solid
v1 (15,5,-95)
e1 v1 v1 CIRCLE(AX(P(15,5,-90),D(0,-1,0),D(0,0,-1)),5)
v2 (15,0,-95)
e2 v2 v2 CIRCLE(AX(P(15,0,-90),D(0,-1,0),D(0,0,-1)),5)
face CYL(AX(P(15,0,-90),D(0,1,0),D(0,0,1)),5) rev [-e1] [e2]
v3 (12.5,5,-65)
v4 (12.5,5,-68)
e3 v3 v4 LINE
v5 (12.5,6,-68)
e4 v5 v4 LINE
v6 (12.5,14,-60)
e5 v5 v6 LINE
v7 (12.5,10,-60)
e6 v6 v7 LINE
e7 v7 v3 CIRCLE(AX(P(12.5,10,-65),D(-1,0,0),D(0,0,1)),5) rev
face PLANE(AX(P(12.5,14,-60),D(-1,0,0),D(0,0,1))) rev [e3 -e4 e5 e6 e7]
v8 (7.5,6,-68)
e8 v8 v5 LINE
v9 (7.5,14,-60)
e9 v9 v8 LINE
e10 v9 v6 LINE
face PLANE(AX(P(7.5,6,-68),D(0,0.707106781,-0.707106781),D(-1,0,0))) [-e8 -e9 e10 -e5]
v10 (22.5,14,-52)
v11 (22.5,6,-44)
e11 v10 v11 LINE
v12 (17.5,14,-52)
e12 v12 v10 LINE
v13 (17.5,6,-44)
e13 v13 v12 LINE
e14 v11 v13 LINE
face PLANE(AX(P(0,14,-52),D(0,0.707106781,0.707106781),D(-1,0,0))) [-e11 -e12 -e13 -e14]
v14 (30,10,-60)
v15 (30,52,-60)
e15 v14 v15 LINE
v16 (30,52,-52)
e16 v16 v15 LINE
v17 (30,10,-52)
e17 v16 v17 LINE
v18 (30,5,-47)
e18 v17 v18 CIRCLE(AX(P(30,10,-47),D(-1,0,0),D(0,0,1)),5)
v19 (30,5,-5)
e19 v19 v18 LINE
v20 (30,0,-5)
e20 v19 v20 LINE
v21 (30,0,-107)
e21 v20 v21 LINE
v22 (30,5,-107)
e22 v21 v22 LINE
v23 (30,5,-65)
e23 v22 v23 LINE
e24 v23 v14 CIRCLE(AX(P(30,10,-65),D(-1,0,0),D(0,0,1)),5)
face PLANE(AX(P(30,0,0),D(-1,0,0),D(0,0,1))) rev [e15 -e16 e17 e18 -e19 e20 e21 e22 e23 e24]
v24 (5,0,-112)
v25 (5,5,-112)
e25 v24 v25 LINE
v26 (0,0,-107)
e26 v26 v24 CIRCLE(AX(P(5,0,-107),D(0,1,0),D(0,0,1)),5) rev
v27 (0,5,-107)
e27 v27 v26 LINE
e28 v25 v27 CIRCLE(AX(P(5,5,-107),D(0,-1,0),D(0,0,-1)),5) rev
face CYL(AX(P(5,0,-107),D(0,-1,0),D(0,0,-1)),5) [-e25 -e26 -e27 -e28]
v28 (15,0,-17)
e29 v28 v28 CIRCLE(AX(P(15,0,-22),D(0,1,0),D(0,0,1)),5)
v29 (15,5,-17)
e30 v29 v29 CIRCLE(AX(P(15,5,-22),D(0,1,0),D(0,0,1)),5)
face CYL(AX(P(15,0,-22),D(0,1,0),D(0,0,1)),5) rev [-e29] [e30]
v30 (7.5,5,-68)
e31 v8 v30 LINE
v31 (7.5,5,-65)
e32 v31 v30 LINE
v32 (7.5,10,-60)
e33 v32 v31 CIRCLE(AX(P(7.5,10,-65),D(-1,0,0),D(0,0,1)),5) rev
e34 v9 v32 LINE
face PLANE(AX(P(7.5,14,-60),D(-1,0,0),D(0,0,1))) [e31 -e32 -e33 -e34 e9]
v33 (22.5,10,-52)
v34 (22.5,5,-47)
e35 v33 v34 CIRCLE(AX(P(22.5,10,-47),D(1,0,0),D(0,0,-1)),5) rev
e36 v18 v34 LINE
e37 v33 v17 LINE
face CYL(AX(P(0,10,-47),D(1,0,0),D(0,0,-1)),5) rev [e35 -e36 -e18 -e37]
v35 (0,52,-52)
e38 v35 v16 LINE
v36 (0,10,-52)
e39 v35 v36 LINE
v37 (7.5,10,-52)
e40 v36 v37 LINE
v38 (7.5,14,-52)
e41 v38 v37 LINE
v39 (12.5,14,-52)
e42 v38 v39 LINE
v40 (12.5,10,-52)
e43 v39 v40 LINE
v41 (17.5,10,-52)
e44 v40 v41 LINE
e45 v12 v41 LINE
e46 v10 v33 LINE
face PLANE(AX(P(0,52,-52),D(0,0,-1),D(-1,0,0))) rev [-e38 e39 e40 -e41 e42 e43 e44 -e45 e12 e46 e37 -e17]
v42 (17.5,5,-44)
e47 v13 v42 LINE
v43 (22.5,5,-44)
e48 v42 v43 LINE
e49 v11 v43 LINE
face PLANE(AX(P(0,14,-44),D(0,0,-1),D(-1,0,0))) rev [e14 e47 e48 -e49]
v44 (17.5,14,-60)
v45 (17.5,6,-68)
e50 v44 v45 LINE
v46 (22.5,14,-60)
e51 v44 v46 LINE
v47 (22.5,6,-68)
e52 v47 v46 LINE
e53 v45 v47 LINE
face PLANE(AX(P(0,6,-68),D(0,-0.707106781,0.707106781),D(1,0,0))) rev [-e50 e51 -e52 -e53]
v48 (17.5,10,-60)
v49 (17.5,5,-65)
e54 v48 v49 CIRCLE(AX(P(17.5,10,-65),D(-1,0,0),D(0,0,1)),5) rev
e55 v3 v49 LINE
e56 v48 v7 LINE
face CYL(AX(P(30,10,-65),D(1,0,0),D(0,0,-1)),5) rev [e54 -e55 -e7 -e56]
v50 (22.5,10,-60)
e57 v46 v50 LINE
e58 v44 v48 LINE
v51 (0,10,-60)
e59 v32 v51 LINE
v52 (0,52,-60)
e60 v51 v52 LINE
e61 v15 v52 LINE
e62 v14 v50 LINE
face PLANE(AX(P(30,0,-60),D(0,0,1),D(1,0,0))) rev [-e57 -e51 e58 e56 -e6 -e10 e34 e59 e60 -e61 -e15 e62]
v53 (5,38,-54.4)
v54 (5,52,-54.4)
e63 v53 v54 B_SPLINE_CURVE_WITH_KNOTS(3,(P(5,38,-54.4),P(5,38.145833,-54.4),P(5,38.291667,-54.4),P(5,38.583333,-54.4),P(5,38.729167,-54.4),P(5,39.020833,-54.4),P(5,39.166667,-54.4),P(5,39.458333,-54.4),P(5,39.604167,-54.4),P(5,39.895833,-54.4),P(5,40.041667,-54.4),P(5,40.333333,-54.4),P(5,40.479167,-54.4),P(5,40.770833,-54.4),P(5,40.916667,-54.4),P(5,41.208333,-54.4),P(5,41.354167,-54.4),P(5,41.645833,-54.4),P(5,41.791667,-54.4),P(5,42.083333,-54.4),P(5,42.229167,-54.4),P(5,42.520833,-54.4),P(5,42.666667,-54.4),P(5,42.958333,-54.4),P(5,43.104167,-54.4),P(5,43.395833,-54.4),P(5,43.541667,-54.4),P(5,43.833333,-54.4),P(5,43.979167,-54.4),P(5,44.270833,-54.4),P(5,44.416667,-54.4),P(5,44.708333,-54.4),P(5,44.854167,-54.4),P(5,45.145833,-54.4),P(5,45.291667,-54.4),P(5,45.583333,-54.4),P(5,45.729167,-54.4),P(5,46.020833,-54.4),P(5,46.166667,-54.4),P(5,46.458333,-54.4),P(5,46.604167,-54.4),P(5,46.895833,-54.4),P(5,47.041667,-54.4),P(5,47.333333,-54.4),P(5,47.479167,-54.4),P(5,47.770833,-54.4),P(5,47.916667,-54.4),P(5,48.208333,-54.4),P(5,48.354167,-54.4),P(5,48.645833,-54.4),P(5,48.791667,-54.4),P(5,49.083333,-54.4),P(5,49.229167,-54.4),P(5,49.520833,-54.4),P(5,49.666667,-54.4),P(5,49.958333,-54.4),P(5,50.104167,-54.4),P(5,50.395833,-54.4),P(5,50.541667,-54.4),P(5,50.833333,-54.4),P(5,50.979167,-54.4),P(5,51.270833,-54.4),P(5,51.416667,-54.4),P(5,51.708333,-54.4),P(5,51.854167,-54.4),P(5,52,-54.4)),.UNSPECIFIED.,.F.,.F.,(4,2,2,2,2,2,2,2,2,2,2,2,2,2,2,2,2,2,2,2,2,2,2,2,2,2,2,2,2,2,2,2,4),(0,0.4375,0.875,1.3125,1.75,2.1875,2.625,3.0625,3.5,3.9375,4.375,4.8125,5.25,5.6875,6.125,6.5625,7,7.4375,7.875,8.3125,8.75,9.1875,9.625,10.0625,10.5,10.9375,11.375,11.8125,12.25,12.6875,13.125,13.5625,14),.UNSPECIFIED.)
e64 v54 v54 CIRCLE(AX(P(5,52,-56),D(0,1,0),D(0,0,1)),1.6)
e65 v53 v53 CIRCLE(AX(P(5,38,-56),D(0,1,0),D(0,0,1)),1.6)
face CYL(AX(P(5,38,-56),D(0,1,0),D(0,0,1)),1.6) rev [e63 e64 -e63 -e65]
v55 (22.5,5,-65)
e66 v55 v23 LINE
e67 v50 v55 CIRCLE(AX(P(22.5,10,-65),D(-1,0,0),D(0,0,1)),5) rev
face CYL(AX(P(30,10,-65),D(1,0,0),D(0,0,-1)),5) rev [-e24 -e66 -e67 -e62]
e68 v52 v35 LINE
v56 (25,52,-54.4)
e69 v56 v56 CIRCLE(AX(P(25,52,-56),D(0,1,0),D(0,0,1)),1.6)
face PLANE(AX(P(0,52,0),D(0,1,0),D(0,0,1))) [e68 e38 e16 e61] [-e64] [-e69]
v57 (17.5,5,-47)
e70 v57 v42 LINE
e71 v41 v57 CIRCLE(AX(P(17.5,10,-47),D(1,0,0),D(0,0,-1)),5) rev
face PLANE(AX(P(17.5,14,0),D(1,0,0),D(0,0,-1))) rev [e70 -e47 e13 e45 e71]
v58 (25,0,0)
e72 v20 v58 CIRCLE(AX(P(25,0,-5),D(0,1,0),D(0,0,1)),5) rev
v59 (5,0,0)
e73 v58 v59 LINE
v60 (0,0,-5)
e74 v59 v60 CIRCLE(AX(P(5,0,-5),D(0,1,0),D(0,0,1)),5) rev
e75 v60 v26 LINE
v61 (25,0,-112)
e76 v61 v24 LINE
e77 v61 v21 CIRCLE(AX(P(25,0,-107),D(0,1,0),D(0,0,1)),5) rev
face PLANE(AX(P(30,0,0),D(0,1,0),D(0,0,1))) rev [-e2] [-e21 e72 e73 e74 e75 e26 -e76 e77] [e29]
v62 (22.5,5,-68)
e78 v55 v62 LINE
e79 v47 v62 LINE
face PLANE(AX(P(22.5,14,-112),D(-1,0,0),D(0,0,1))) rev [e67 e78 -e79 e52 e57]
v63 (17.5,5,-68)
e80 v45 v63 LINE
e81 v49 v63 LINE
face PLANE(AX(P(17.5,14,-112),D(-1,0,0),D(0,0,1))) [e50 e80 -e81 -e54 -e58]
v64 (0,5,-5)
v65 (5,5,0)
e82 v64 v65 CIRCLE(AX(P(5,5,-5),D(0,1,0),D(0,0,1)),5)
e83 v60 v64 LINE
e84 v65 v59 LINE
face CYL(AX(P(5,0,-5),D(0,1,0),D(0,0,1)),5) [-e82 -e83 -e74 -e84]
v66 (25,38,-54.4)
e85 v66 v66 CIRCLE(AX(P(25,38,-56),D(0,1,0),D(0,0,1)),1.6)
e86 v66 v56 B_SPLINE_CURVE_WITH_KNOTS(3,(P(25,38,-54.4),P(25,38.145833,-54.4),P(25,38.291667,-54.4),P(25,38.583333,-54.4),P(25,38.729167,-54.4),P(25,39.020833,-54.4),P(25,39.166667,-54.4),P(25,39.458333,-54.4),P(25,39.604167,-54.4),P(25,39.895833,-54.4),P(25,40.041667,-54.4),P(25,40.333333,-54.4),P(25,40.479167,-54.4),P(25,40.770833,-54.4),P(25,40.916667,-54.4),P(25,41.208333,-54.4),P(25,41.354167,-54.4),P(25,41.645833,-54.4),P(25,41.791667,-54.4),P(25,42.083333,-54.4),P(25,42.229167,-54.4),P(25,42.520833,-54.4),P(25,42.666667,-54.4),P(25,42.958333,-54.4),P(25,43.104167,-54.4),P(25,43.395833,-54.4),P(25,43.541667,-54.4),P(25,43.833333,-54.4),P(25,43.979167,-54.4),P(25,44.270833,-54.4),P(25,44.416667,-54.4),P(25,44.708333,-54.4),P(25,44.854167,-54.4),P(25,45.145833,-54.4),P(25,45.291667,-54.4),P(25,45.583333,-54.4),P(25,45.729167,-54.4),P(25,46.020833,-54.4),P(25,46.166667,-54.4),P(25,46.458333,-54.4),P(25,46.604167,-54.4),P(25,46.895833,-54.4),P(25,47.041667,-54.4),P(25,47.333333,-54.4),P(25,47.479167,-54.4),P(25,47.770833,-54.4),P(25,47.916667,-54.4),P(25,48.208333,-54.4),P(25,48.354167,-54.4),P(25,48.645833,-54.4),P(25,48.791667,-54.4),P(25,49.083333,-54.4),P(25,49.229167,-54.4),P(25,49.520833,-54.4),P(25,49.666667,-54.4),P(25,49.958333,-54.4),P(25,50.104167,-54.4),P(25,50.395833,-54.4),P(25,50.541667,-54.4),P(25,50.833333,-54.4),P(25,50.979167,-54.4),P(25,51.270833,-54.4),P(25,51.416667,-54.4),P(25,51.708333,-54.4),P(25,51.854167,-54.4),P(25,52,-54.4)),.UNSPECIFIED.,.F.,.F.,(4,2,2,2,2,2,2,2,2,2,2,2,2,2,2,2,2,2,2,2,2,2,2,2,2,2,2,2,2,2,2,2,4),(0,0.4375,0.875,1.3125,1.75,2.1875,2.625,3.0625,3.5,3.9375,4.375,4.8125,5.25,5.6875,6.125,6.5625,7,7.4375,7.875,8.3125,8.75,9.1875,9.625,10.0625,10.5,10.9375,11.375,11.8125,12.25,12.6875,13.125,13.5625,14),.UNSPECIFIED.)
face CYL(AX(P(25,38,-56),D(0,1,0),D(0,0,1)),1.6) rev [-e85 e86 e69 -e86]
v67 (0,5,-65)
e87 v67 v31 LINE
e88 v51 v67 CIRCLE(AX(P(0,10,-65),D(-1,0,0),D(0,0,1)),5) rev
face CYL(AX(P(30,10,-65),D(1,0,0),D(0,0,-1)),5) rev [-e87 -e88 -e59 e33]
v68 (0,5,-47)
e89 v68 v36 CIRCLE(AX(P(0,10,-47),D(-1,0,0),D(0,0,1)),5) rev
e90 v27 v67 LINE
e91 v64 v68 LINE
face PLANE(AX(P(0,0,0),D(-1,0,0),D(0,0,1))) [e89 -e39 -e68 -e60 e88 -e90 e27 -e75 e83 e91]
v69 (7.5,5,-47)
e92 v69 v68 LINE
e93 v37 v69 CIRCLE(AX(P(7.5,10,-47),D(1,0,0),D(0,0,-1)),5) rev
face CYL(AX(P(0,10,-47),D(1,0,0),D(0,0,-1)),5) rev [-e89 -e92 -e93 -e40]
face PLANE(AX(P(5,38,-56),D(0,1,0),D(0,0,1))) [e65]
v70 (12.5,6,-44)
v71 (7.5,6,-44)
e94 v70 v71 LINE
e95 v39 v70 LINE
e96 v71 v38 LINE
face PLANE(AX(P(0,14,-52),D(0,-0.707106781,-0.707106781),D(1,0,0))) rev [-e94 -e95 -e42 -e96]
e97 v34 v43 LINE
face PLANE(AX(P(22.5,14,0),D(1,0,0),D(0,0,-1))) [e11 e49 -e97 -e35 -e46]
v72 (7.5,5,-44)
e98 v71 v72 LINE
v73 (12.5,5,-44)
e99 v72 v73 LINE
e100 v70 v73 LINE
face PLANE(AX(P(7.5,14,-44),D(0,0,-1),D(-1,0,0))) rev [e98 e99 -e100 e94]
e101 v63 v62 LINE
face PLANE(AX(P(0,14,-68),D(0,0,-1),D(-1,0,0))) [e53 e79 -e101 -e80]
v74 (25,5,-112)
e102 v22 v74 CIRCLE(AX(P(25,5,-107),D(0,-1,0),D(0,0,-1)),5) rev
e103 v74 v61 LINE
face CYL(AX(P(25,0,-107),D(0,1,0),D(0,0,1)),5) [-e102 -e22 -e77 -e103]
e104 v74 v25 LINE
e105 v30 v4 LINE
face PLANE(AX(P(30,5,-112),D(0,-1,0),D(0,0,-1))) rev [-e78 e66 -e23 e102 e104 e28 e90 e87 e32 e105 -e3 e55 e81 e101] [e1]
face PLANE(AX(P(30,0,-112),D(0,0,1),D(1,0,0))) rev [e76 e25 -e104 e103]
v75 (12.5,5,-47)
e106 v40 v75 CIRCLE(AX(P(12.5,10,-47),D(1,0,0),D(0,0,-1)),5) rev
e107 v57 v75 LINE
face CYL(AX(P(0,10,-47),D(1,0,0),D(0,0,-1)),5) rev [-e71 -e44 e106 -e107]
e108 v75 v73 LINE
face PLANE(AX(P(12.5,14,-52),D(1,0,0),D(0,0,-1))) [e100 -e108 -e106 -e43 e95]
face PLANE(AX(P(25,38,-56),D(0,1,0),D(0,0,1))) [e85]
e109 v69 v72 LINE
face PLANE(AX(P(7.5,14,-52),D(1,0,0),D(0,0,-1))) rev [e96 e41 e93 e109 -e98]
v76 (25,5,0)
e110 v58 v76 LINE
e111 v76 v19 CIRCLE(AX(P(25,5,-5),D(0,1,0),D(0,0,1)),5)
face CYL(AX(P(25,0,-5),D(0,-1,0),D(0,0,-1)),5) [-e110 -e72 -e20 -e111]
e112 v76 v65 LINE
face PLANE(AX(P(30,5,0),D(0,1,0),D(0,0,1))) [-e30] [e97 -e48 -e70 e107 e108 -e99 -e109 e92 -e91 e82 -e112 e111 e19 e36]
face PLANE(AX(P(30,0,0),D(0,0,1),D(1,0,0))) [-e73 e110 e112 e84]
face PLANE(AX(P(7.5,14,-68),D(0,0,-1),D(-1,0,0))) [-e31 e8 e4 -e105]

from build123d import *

# Parameters (mm, degrees)
SKETCH1_W                = 60
SKETCH1_H                = 5
BOSS_EXTRUDE1_DEPTH      = 30
SKETCH2_W                = 30
SKETCH2_H                = 8
BOSS_EXTRUDE2_DEPTH      = 47
SKETCH3_R                = 5
CUT_EXTRUDE1_DEPTH       = 82.908485519
SKETCH5_R                = 1.6
CUT_EXTRUDE3_DEPTH       = 14
FILLET1_R                = 5
FILLET2_R                = 5
SKETCH6_W                = 5
SKETCH6_H                = 5
SKETCH6_H_2              = 3
SKETCH6_H_3              = 8
BOSS_EXTRUDE3_DEPTH      = 9
CHAMFER1_SIZE            = 8
CHAMFER1_OF_MIRROR2_SIZE = 8


with BuildPart() as part:
    # Sketch1 → Boss-Extrude1 (new body)
    with BuildSketch(Plane(origin=(0, 0, 0), x_dir=(0, 0, -1), z_dir=(1, 0, 0))):
        with Locations((30, 2.5)):
            Rectangle(SKETCH1_W, SKETCH1_H)
    boss_extrude1 = extrude(amount=BOSS_EXTRUDE1_DEPTH)

    # Sketch2 → Boss-Extrude2 (add)
    with BuildSketch(Plane(origin=(0, 5, 0), x_dir=(1, 0, 0), z_dir=(0, 1, 0))):
        with Locations((15, 56)):
            Rectangle(SKETCH2_W, SKETCH2_H)
    extrude(amount=BOSS_EXTRUDE2_DEPTH)

    # Sketch3 → Cut-Extrude1 (cut, through all)
    with BuildSketch(Plane(origin=(0, 5, 0), x_dir=(1, 0, 0), z_dir=(0, 1, 0))):
        with Locations(Location((15, 22, 0), (0, 0, 270))):
            Circle(SKETCH3_R)
    cut_extrude1 = extrude(amount=-CUT_EXTRUDE1_DEPTH, mode=Mode.SUBTRACT)

    # Sketch5 → Cut-Extrude3 (cut)
    with BuildSketch(Plane(origin=(0, 52, 0), x_dir=(1, 0, 0), z_dir=(0, 1, 0))):
        with Locations(Location((5, 56, 0), (0, 0, 270))):
            Circle(SKETCH5_R)
        with Locations(Location((25, 56, 0), (0, 0, 270))):
            Circle(SKETCH5_R)
    extrude(amount=-CUT_EXTRUDE3_DEPTH, mode=Mode.SUBTRACT)

    # Fillet1
    fillet1_edges = [part.edges().sort_by_distance(p)[0] for p in [
        (15, 5, -52),
        (30, 2.5, 0),
        (0, 2.5, 0),
        (15, 0, -60),
    ]]
    fillet(fillet1_edges, radius=FILLET1_R)

    # Mirror1: Boss-Extrude1, Cut-Extrude1 across plane
    add(boss_extrude1.mirror(Plane(origin=(0, 0, -56), x_dir=(1, 0, 0), z_dir=(0, 0, -1))))
    add(cut_extrude1.mirror(Plane(origin=(0, 0, -56), x_dir=(1, 0, 0), z_dir=(0, 0, -1))), mode=Mode.SUBTRACT)

    # Fillet2
    fillet2_edges = [part.edges().sort_by_distance(p)[0] for p in [
        (15, 5, -60),
        (0, 2.5, -112),
        (30, 2.5, -112),
    ]]
    fillet(fillet2_edges, radius=FILLET2_R)

    # Sketch6 → Boss-Extrude3 (add)
    with BuildSketch(Plane(origin=(0, 5, 0), x_dir=(1, 0, 0), z_dir=(0, 1, 0))):
        with Locations((20, 49.5)):
            Rectangle(SKETCH6_W, SKETCH6_H)
        with Locations((20, 45.5)):
            Rectangle(SKETCH6_W, SKETCH6_H_2)
        with Locations((10, 48)):
            Rectangle(SKETCH6_W, SKETCH6_H_3)
    boss_extrude3 = extrude(amount=BOSS_EXTRUDE3_DEPTH)

    # Chamfer1
    chamfer1_edges = [part.edges().sort_by_distance(p)[0] for p in [
        (20, 14, -44),
        (10, 14, -44),
    ]]
    chamfer(chamfer1_edges, length=CHAMFER1_SIZE - 0.0001)  # a hair under: the kernel refuses the full size

    # Mirror2: Boss-Extrude3 across plane
    add(boss_extrude3.mirror(Plane(origin=(0, 0, -56), x_dir=(1, 0, 0), z_dir=(0, 0, -1))))

    # Chamfer1 of Mirror2
    chamfer1_of_mirror2_edges = [part.edges().sort_by_distance(p)[0] for p in [
        (20, 14, -68),
        (10, 14, -68),
    ]]
    chamfer(chamfer1_of_mirror2_edges, length=CHAMFER1_OF_MIRROR2_SIZE - 0.0001)  # a hair under: the kernel refuses the full size


solid = part.part
